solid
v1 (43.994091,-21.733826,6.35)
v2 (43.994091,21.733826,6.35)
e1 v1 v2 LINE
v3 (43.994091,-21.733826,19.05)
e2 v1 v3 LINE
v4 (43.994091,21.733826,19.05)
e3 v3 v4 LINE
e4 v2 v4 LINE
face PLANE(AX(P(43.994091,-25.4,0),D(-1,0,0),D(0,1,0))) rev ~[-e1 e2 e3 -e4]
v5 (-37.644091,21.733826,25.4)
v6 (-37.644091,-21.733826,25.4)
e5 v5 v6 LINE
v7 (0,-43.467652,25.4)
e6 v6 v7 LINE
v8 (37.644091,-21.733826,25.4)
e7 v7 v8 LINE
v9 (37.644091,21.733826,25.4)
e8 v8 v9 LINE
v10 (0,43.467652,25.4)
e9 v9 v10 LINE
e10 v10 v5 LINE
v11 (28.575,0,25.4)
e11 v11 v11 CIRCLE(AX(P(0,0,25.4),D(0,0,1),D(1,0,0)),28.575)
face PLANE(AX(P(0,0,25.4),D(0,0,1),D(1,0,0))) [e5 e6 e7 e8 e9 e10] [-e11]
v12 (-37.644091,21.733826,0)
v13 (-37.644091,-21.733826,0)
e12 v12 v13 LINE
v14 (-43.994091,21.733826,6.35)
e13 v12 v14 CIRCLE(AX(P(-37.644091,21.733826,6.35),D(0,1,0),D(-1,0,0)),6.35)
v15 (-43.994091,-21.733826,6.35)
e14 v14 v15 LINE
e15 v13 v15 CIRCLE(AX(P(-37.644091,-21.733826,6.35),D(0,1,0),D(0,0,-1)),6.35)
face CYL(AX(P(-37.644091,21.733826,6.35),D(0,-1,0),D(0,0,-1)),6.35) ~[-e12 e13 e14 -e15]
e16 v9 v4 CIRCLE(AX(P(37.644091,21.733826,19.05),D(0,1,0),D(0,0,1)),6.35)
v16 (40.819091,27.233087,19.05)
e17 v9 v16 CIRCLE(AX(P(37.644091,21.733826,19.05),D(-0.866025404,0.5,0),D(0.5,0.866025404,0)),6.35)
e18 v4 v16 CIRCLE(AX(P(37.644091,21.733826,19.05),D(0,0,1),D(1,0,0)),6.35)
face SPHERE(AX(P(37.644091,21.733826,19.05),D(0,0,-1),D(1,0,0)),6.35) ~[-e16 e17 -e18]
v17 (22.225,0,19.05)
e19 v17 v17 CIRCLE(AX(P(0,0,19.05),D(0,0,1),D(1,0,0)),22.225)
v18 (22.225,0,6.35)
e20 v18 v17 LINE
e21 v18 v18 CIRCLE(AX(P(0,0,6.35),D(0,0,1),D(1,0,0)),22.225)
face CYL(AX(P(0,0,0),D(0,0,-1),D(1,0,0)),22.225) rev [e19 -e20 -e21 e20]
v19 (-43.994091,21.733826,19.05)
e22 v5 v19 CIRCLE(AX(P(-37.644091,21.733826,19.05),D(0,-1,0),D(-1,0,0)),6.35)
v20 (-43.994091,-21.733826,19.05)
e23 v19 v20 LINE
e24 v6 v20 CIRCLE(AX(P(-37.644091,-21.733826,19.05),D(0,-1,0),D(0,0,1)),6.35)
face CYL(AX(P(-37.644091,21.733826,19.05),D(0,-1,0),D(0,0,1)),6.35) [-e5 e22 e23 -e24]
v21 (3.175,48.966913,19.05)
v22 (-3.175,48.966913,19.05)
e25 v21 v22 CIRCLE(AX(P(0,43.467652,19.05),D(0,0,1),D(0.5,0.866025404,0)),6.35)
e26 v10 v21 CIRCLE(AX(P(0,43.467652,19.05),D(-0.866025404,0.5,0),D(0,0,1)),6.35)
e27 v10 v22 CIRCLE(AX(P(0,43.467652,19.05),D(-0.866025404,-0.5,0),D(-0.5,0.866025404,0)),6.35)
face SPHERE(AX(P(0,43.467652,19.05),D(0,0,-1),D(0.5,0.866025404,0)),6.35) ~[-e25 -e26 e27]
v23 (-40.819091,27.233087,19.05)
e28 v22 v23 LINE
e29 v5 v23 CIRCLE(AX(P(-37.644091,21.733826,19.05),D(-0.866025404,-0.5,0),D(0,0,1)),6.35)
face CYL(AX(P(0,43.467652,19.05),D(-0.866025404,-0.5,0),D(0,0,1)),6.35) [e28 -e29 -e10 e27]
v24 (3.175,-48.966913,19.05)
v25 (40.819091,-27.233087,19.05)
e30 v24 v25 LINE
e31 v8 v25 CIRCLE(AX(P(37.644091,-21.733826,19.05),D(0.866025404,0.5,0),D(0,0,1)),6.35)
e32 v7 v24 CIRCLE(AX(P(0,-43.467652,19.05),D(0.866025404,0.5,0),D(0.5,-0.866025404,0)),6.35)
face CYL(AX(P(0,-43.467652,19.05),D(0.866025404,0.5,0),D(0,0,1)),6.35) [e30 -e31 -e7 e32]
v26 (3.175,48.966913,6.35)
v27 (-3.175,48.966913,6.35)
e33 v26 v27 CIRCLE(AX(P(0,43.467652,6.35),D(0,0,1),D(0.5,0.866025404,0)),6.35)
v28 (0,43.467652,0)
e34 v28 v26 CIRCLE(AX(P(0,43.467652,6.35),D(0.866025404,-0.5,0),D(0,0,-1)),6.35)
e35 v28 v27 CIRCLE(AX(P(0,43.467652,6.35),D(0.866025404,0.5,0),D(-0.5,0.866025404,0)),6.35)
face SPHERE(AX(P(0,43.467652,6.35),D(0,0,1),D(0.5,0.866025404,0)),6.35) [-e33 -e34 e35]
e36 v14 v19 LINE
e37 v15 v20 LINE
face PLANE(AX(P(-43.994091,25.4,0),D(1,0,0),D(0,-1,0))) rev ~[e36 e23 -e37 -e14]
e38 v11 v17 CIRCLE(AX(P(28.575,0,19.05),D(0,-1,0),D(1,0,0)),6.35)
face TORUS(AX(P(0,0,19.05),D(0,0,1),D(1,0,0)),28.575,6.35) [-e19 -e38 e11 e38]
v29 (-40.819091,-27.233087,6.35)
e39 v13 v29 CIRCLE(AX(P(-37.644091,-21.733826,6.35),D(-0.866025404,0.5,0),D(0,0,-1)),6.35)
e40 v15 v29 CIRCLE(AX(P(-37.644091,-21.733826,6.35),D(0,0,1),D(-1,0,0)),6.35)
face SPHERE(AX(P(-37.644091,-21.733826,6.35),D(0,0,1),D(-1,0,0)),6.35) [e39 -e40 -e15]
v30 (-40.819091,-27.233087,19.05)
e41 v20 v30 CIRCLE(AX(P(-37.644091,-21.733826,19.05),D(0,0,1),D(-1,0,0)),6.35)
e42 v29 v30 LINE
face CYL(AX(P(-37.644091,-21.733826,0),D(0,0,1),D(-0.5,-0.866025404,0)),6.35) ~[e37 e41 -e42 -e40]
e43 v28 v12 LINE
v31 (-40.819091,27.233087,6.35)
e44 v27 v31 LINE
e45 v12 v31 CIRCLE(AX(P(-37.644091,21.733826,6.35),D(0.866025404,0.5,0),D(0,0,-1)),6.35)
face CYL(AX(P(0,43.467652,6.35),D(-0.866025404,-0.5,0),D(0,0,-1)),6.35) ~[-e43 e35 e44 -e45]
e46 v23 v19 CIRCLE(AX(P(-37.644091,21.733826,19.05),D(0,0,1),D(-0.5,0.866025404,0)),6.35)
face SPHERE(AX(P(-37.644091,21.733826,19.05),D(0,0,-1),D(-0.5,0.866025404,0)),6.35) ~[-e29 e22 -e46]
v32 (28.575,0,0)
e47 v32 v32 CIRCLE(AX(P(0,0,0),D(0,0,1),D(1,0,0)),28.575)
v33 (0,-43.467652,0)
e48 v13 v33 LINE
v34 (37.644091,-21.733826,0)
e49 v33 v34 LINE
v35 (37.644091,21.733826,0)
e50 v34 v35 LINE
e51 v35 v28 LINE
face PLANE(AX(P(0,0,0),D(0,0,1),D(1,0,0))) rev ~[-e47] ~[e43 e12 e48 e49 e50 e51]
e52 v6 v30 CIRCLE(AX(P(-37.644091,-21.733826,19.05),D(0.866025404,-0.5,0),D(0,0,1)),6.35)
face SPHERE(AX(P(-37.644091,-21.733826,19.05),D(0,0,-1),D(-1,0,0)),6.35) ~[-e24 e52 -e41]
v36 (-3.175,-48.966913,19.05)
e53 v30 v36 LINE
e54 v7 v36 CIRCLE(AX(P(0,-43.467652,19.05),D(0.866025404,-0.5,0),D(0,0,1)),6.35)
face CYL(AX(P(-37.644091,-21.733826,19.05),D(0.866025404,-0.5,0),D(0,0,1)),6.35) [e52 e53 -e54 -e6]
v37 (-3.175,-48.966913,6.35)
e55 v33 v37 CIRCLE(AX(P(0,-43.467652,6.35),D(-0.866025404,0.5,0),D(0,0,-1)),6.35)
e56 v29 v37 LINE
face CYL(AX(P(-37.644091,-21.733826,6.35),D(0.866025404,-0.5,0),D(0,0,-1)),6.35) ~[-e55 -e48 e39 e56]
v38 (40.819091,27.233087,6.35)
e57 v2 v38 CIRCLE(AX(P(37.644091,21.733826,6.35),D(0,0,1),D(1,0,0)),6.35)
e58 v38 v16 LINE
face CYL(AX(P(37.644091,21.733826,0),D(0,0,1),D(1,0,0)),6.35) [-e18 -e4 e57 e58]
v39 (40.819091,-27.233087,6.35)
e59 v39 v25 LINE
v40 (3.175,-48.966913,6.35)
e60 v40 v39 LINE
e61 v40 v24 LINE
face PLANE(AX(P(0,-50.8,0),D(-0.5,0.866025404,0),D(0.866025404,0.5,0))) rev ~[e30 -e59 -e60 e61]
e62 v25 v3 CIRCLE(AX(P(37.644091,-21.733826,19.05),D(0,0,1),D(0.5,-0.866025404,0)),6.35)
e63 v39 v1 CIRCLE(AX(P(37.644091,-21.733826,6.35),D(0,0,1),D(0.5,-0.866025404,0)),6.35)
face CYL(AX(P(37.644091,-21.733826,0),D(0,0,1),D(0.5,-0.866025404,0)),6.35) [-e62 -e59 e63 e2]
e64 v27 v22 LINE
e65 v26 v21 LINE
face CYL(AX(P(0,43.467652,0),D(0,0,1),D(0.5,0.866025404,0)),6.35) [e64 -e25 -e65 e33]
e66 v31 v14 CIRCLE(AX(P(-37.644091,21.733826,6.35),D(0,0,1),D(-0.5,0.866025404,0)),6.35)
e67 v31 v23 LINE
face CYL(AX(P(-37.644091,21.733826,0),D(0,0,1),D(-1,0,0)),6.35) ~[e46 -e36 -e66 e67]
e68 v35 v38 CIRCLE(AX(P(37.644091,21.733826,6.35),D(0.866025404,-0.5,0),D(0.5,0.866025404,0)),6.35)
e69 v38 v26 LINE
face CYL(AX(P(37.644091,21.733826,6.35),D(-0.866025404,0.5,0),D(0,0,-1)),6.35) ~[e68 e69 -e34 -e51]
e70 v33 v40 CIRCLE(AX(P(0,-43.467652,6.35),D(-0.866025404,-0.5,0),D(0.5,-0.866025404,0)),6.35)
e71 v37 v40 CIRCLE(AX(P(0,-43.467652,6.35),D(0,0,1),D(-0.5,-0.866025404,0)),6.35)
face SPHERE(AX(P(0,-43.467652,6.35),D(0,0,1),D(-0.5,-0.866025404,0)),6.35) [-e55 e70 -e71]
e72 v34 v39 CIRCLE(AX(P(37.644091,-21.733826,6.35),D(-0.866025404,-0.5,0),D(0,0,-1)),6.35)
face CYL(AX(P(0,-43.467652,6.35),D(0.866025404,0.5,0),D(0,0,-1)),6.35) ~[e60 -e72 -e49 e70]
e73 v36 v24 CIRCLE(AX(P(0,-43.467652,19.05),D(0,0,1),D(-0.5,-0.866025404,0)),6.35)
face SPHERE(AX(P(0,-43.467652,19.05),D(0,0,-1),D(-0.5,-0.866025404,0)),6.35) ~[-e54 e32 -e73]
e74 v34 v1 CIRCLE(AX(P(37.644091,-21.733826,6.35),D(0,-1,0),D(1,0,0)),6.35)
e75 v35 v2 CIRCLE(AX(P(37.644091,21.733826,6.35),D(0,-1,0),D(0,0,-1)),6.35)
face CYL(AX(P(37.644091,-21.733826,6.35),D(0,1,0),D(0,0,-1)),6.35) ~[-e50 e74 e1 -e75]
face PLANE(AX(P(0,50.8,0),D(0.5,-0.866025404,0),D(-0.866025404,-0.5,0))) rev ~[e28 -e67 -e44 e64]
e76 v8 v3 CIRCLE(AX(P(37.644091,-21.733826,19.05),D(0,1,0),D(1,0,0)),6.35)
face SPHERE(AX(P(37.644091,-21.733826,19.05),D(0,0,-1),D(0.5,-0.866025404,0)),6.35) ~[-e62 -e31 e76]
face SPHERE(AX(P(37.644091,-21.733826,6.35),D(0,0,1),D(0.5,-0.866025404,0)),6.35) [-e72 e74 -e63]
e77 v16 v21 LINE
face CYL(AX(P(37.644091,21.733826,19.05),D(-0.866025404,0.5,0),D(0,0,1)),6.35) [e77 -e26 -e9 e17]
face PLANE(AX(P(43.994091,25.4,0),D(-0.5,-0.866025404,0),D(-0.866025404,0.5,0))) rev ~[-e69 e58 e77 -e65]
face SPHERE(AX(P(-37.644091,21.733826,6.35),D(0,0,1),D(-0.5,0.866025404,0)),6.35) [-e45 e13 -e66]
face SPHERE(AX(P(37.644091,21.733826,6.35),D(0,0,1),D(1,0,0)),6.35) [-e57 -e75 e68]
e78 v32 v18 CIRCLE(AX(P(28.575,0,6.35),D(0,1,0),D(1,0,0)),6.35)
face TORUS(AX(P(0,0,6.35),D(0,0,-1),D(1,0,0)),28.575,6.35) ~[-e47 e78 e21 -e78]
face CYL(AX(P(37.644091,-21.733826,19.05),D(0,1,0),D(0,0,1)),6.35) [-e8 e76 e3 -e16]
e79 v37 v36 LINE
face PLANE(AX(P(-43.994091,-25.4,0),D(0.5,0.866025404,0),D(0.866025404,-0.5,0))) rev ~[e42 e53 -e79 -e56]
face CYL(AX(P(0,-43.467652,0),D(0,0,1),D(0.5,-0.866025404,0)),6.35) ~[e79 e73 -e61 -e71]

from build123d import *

# Parameters (mm, degrees)
F0_R     = 22.225
F1_DEPTH = 25.4
F2_R     = 6.35
F3_R     = 6.35


# Not quite as in the source:
# - a feature names something its author has since deleted; it is built from what else it names


with BuildPart() as f1:
    # F0 (on Top) → F1 (new body)
    with BuildSketch(Plane.XY):
        Polygon((0, -50.8), (43.9940905122, -25.4), (43.9940905122, 25.4), (0, 50.8), (-43.9940905122, 25.4), (-43.9940905122, -25.4), align=None)
        Circle(F0_R, mode=Mode.SUBTRACT)
    extrude(amount=F1_DEPTH)

    # F2
    f2_edges = [f1.edges().sort_by_distance(p)[0] for p in [
        (-43.994091, -25.4, 12.7),
        (-43.994091, 25.4, 12.7),
        (0, -50.8, 12.7),
        (43.994091, -25.4, 12.7),
        (43.994091, 25.4, 12.7),
        (0, 50.8, 12.7),
    ]]
    fillet(f2_edges, radius=F2_R)

    # F3
    f3_edges = [f1.edges().sort_by_distance(p)[0] for p in [
        (-21.997045, -38.1, 25.4),
        (-21.997045, -38.1, 0),
        (-22.225, 0, 25.4),
        (-22.225, 0, 0),
    ]]
    fillet(f3_edges, radius=F3_R)


solid = f1.part
